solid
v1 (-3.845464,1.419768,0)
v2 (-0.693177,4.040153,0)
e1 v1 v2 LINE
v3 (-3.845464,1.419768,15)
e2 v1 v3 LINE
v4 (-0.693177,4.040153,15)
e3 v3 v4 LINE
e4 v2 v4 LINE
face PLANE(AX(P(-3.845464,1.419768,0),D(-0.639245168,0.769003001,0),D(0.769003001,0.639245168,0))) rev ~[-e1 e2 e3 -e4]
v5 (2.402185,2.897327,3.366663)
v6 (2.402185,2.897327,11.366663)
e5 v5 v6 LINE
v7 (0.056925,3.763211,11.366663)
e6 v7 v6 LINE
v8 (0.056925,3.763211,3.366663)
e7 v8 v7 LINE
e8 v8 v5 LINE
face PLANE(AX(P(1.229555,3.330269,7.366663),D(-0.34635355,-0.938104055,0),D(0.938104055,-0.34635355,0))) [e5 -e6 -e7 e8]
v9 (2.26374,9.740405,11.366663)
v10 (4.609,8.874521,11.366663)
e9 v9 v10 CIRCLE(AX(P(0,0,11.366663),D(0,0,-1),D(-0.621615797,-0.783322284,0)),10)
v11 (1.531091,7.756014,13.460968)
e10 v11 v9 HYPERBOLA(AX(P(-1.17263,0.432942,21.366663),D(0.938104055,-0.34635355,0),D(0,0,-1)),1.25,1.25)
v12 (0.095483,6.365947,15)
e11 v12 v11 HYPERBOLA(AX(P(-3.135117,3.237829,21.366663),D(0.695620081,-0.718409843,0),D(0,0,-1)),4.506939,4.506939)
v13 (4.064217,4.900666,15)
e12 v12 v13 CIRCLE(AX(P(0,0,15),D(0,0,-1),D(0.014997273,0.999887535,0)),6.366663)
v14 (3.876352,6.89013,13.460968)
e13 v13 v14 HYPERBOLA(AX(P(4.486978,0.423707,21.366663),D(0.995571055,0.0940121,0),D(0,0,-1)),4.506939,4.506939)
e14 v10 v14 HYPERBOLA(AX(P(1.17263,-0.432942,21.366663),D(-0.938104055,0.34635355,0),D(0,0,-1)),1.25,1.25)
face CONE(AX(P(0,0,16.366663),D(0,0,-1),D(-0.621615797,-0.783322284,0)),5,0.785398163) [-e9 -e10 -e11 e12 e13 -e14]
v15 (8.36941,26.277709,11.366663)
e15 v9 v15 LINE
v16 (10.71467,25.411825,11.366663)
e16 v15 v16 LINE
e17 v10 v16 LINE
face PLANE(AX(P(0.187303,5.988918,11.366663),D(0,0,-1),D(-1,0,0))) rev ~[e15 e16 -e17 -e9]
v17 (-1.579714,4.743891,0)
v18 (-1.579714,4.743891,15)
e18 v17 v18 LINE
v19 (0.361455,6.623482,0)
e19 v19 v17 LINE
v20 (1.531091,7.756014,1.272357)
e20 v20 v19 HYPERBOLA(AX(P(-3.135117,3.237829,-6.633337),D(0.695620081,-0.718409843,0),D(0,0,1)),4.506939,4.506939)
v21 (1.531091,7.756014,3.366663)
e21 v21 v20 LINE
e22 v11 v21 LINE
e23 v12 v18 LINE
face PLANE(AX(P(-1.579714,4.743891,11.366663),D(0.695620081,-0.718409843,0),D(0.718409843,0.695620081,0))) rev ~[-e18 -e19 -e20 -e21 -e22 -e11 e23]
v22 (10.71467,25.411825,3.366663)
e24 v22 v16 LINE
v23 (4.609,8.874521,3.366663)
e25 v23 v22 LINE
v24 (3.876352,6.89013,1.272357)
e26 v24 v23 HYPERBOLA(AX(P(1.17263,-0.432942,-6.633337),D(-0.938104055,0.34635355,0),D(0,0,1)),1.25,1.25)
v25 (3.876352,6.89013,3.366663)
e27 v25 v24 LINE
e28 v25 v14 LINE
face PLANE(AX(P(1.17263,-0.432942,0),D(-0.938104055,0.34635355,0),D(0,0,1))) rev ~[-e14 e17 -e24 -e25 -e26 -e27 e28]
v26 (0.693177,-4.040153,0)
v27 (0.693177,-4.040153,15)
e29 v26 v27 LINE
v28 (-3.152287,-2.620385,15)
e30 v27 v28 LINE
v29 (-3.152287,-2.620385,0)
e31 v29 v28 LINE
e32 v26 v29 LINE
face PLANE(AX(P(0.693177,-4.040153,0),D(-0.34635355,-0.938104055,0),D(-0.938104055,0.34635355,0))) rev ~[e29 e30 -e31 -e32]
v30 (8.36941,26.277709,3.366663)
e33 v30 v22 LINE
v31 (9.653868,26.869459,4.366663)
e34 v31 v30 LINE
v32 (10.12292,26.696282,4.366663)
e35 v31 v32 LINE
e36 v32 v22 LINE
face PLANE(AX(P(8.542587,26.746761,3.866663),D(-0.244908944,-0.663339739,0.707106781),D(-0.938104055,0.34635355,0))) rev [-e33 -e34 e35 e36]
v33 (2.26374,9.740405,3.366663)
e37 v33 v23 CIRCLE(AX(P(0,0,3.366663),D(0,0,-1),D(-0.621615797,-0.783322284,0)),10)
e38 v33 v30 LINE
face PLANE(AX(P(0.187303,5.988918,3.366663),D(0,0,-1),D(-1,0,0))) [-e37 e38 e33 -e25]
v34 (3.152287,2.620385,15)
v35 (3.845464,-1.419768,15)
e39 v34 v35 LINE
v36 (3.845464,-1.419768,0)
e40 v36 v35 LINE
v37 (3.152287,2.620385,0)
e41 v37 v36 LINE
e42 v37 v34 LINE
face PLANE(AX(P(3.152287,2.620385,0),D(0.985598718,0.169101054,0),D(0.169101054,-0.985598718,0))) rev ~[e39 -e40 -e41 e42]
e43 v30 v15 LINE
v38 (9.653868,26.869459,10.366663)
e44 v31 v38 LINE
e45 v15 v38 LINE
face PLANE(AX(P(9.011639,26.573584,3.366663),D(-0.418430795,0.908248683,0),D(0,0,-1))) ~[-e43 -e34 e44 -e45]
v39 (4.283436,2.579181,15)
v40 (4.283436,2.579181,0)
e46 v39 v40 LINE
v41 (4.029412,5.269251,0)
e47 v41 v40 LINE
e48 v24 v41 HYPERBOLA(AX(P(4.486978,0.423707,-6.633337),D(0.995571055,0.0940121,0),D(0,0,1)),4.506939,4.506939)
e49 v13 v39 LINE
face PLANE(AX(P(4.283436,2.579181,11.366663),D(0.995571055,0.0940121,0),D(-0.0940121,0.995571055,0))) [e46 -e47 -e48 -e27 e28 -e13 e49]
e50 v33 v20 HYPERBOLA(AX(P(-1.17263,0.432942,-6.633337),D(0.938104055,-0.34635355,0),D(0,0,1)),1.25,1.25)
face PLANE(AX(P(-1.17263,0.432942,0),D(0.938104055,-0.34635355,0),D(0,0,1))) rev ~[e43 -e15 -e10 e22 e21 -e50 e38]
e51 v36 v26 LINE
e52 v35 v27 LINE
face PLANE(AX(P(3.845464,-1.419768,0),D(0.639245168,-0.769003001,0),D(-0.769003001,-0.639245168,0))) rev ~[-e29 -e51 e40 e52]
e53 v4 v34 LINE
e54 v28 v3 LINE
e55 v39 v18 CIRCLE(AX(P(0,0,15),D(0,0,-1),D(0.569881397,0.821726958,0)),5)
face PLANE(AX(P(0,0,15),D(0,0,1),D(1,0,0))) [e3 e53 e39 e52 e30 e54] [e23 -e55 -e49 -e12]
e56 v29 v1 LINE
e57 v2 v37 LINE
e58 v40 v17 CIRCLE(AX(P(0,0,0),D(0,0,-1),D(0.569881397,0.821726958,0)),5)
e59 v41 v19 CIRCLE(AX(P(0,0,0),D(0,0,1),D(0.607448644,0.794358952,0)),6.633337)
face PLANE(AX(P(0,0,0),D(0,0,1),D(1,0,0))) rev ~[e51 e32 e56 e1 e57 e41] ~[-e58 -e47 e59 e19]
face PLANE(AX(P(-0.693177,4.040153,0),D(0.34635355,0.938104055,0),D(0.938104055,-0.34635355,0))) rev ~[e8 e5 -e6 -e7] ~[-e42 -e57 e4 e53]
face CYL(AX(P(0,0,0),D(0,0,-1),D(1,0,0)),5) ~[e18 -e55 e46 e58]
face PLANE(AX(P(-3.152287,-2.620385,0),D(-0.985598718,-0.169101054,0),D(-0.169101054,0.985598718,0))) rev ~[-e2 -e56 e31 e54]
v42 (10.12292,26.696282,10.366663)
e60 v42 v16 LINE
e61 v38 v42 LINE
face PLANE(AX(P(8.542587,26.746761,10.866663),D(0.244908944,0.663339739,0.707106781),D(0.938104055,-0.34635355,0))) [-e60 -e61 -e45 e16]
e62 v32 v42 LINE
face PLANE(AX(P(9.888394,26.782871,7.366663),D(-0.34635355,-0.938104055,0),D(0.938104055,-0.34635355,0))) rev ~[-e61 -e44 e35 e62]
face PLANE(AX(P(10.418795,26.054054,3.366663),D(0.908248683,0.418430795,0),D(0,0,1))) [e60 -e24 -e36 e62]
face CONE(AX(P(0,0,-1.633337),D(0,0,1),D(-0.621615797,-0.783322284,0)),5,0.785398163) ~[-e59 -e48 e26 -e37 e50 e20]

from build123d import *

# Parameters (mm, degrees)
F0_R         = 5
F1_DEPTH     = 15
F2_W         = 2.5
F2_H         = 8
F3_DEPTH     = 25
F4_T1_DEPTH  = 8
F4_T6_ANGLE  = 323.6604372277
F4_T13_ANGLE = 323.6604372277
F4_T21_ANGLE = 323.6604372277
F4_T26_DEPTH = 15.8662197745
F4_T34_ANGLE = 323.6604372277
F4_T39_DEPTH = 15.8662197745
F4_T47_DEPTH = 15.8662197745
F4_T52_ANGLE = 323.6604372277
F4_T60_ANGLE = 323.6604372277
F4_T65_DEPTH = 15.8662197745
F5_SIZE      = 1


# Not quite as in the source:
# - a fillet or chamfer that OpenCascade refuses, or shapes differently, is made with other operations: its cross-section is extruded or revolved along the edge and cut away or added


with BuildPart() as f1:
    # F0 (on Top) → F1 (new body)
    with BuildSketch(Plane.XY):
        Circle(F0_R)
        Polygon((3.1522870356, 2.6203854256), (3.8454638641, -1.4197679401), (0.6931768285, -4.0401533656), (-3.1522870356, -2.6203854256), (-3.8454638641, 1.4197679401), (-0.6931768285, 4.0401533656), align=None, mode=Mode.SUBTRACT)
    extrude(amount=F1_DEPTH)

    # F2 (on face) → F3 (join)
    with BuildSketch(Plane(origin=(1.2295551036, 3.3302693956, 0), x_dir=(0.9381040551, -0.3463535503, 0), z_dir=(-0.3463535503, -0.9381040551, 0))):
        with Locations((0, 7.3666626269)):
            Rectangle(F2_W, F2_H)
    extrude(amount=-F3_DEPTH)

    # F4: chamfer of 5 on 4 edges, made by hand

    # F4_s2 → F4_t1 (join)
    with BuildSketch(Plane.XY.offset(3.3666626269)):
        with BuildLine():
            Line((-1.5797144045, 4.7438910612), (1.5310914666, 7.7560143709))
            Line((1.5310914666, 7.7560143709), (0.5041468464, 4.9745186659))
            ThreePointArc((0.5041468464, 4.9745186659), (-0.631305898, 4.9599851676), (-1.5797144045, 4.7438910612))
        make_face()
        with BuildLine():
            Line((4.2834359399, 2.5791813718), (3.8763516043, 6.8901304951))
            Line((3.8763516043, 6.8901304951), (2.8494069841, 4.1086347901))
            ThreePointArc((2.8494069841, 4.1086347901), (3.702995808, 3.359735413), (4.2834359399, 2.5791813718))
        make_face()
    extrude(amount=F4_T1_DEPTH)


with BuildPart() as f4_tool4:
    # F4_s5 → F4_t6 (revolve)
    with BuildSketch(Plane(origin=(0, 0, 0), x_dir=(0, 0, 1), z_dir=(0.7833222839, -0.6216157974, 0))):
        Polygon((16.3666626269, 5), (11.3666626269, 10), (11.3666626269, 5), align=None)
    revolve(axis=Axis((0, 0, 11.3666626269), (0, 0, -1)), revolution_arc=F4_T6_ANGLE)

    split(bisect_by=Plane.XY.offset(15), keep=Keep.BOTTOM)

    split(bisect_by=Plane(origin=(-1.1726300689, 0.4329419379, 0), x_dir=(0, 0, 1), z_dir=(0.9381040551, -0.3463535503, 0)), keep=Keep.TOP)

    split(bisect_by=Plane(origin=(1.1726300689, -0.4329419379, 0), x_dir=(0, 0, 1), z_dir=(-0.9381040551, 0.3463535503, 0)), keep=Keep.TOP)


with BuildPart() as f1_1:
    add(f1.part)

    # F4_t3: union F4_tool4
    add(f4_tool4.part)


with BuildPart() as f4_tool11:
    # F4_s12 → F4_t13 (revolve)
    with BuildSketch(Plane(origin=(0, 0, 0), x_dir=(0, 0, 1), z_dir=(0.7833222839, -0.6216157974, 0))):
        Polygon((-1.6333373731, 5), (3.3666626269, 10), (3.3666626269, 5), align=None)
    revolve(axis=Axis((0, 0, 3.3666626269), (0, 0, -1)), revolution_arc=F4_T13_ANGLE)

    split(bisect_by=Plane.XY, keep=Keep.TOP)

    split(bisect_by=Plane(origin=(-1.1726300689, 0.4329419379, 0), x_dir=(0, 0, 1), z_dir=(0.9381040551, -0.3463535503, 0)), keep=Keep.TOP)

    split(bisect_by=Plane(origin=(1.1726300689, -0.4329419379, 0), x_dir=(0, 0, 1), z_dir=(-0.9381040551, 0.3463535503, 0)), keep=Keep.TOP)


with BuildPart() as f1_2:
    add(f1_1.part)

    # F4_t10: union F4_tool11
    add(f4_tool11.part)


with BuildPart() as f4_tool19:
    # F4_s20 → F4_t21 (revolve)
    with BuildSketch(Plane(origin=(0, 0, 0), x_dir=(0, 0, 1), z_dir=(0.7833222839, -0.6216157974, 0))):
        Polygon((16.3666626269, 5), (11.3666626269, 10), (11.3666626269, 5), align=None)
    revolve(axis=Axis((0, 0, 11.3666626269), (0, 0, -1)), revolution_arc=F4_T21_ANGLE)

    split(bisect_by=Plane.XY.offset(15), keep=Keep.BOTTOM)

    split(bisect_by=Plane(origin=(-1.1726300689, 0.4329419379, 0), x_dir=(0, 0, 1), z_dir=(-0.9381040551, 0.3463535503, 0)), keep=Keep.TOP)


with BuildPart() as f4_tool24:
    # F4_s25 → F4_t26 (new body)
    with BuildSketch(Plane.XY.offset(19.2328824014)):
        with BuildLine():
            Line((-1.5797144045, 4.7438910612), (1.5310914666, 7.7560143709))
            Line((1.5310914666, 7.7560143709), (0.5041468464, 4.9745186659))
            ThreePointArc((0.5041468464, 4.9745186659), (-0.631305898, 4.9599851676), (-1.5797144045, 4.7438910612))
        make_face()
    extrude(amount=-F4_T26_DEPTH)

    split(bisect_by=Plane.XY.offset(15), keep=Keep.BOTTOM)

    split(bisect_by=Plane.XY.offset(11.3666626269), keep=Keep.TOP)


with BuildPart() as f4_tool19_1:
    add(f4_tool19.part)

    # F4_t29: intersect F4_tool24
    add(f4_tool24.part, mode=Mode.INTERSECT)


with BuildPart() as f1_3:
    add(f1_2.part)

    # F4_t17: union F4_tool19
    add(f4_tool19_1.part)


with BuildPart() as f4_tool32:
    # F4_s33 → F4_t34 (revolve)
    with BuildSketch(Plane(origin=(0, 0, 0), x_dir=(0, 0, 1), z_dir=(0.7833222839, -0.6216157974, 0))):
        Polygon((16.3666626269, 5), (11.3666626269, 10), (11.3666626269, 5), align=None)
    revolve(axis=Axis((0, 0, 11.3666626269), (0, 0, -1)), revolution_arc=F4_T34_ANGLE)

    split(bisect_by=Plane.XY.offset(15), keep=Keep.BOTTOM)

    split(bisect_by=Plane(origin=(1.1726300689, -0.4329419379, 0), x_dir=(0, 0, 1), z_dir=(0.9381040551, -0.3463535503, 0)), keep=Keep.TOP)


with BuildPart() as f4_tool37:
    # F4_s38 → F4_t39 (new body)
    with BuildSketch(Plane.XY.offset(19.2328824014)):
        with BuildLine():
            Line((4.2834359399, 2.5791813718), (3.8763516043, 6.8901304951))
            Line((3.8763516043, 6.8901304951), (2.8494069841, 4.1086347901))
            ThreePointArc((2.8494069841, 4.1086347901), (3.702995808, 3.359735413), (4.2834359399, 2.5791813718))
        make_face()
    extrude(amount=-F4_T39_DEPTH)

    split(bisect_by=Plane.XY.offset(15), keep=Keep.BOTTOM)

    split(bisect_by=Plane.XY.offset(11.3666626269), keep=Keep.TOP)


with BuildPart() as f4_tool32_1:
    add(f4_tool32.part)

    # F4_t42: intersect F4_tool37
    add(f4_tool37.part, mode=Mode.INTERSECT)


with BuildPart() as f1_4:
    add(f1_3.part)

    # F4_t30: union F4_tool32
    add(f4_tool32_1.part)


with BuildPart() as f4_tool45:
    # F4_s46 → F4_t47 (new body)
    with BuildSketch(Plane.XY.offset(11.3666626269)):
        with BuildLine():
            Line((-1.5797144045, 4.7438910612), (1.5310914666, 7.7560143709))
            Line((1.5310914666, 7.7560143709), (0.5041468464, 4.9745186659))
            ThreePointArc((0.5041468464, 4.9745186659), (-0.631305898, 4.9599851676), (-1.5797144045, 4.7438910612))
        make_face()
    extrude(amount=-F4_T47_DEPTH)

    split(bisect_by=Plane.XY, keep=Keep.TOP)

    split(bisect_by=Plane.XY.offset(3.3666626269), keep=Keep.BOTTOM)


with BuildPart() as f4_tool50:
    # F4_s51 → F4_t52 (revolve)
    with BuildSketch(Plane(origin=(0, 0, 0), x_dir=(0, 0, 1), z_dir=(0.7833222839, -0.6216157974, 0))):
        Polygon((-1.6333373731, 5), (3.3666626269, 10), (3.3666626269, 5), align=None)
    revolve(axis=Axis((0, 0, 3.3666626269), (0, 0, -1)), revolution_arc=F4_T52_ANGLE)

    split(bisect_by=Plane.XY, keep=Keep.TOP)

    split(bisect_by=Plane(origin=(-1.1726300689, 0.4329419379, 0), x_dir=(0, 0, 1), z_dir=(-0.9381040551, 0.3463535503, 0)), keep=Keep.TOP)


with BuildPart() as f4_tool45_1:
    add(f4_tool45.part)

    # F4_t55: intersect F4_tool50
    add(f4_tool50.part, mode=Mode.INTERSECT)


with BuildPart() as f1_5:
    add(f1_4.part)

    # F4_t43: union F4_tool45
    add(f4_tool45_1.part)


with BuildPart() as f4_tool58:
    # F4_s59 → F4_t60 (revolve)
    with BuildSketch(Plane(origin=(0, 0, 0), x_dir=(0, 0, 1), z_dir=(0.7833222839, -0.6216157974, 0))):
        Polygon((-1.6333373731, 5), (3.3666626269, 10), (3.3666626269, 5), align=None)
    revolve(axis=Axis((0, 0, 3.3666626269), (0, 0, -1)), revolution_arc=F4_T60_ANGLE)

    split(bisect_by=Plane.XY, keep=Keep.TOP)

    split(bisect_by=Plane(origin=(1.1726300689, -0.4329419379, 0), x_dir=(0, 0, 1), z_dir=(0.9381040551, -0.3463535503, 0)), keep=Keep.TOP)


with BuildPart() as f4_tool63:
    # F4_s64 → F4_t65 (new body)
    with BuildSketch(Plane.XY.offset(11.3666626269)):
        with BuildLine():
            Line((4.2834359399, 2.5791813718), (3.8763516043, 6.8901304951))
            Line((3.8763516043, 6.8901304951), (2.8494069841, 4.1086347901))
            ThreePointArc((2.8494069841, 4.1086347901), (3.702995808, 3.359735413), (4.2834359399, 2.5791813718))
        make_face()
    extrude(amount=-F4_T65_DEPTH)

    split(bisect_by=Plane.XY, keep=Keep.TOP)

    split(bisect_by=Plane.XY.offset(3.3666626269), keep=Keep.BOTTOM)


with BuildPart() as f4_tool58_1:
    add(f4_tool58.part)

    # F4_t68: intersect F4_tool63
    add(f4_tool63.part, mode=Mode.INTERSECT)


with BuildPart() as f1_6:
    add(f1_5.part)

    # F4_t56: union F4_tool58
    add(f4_tool58_1.part)

    # F5
    f5_edges = [f1_6.edges().sort_by_distance(p)[0] for p in [
        (11.061024, 26.349929, 7.366663),
        (9.888394, 26.782871, 11.366663),
        (8.715764, 27.215813, 7.366663),
        (9.888394, 26.782871, 3.366663),
    ]]
    chamfer(f5_edges, length=F5_SIZE)


solid = f1_6.part
